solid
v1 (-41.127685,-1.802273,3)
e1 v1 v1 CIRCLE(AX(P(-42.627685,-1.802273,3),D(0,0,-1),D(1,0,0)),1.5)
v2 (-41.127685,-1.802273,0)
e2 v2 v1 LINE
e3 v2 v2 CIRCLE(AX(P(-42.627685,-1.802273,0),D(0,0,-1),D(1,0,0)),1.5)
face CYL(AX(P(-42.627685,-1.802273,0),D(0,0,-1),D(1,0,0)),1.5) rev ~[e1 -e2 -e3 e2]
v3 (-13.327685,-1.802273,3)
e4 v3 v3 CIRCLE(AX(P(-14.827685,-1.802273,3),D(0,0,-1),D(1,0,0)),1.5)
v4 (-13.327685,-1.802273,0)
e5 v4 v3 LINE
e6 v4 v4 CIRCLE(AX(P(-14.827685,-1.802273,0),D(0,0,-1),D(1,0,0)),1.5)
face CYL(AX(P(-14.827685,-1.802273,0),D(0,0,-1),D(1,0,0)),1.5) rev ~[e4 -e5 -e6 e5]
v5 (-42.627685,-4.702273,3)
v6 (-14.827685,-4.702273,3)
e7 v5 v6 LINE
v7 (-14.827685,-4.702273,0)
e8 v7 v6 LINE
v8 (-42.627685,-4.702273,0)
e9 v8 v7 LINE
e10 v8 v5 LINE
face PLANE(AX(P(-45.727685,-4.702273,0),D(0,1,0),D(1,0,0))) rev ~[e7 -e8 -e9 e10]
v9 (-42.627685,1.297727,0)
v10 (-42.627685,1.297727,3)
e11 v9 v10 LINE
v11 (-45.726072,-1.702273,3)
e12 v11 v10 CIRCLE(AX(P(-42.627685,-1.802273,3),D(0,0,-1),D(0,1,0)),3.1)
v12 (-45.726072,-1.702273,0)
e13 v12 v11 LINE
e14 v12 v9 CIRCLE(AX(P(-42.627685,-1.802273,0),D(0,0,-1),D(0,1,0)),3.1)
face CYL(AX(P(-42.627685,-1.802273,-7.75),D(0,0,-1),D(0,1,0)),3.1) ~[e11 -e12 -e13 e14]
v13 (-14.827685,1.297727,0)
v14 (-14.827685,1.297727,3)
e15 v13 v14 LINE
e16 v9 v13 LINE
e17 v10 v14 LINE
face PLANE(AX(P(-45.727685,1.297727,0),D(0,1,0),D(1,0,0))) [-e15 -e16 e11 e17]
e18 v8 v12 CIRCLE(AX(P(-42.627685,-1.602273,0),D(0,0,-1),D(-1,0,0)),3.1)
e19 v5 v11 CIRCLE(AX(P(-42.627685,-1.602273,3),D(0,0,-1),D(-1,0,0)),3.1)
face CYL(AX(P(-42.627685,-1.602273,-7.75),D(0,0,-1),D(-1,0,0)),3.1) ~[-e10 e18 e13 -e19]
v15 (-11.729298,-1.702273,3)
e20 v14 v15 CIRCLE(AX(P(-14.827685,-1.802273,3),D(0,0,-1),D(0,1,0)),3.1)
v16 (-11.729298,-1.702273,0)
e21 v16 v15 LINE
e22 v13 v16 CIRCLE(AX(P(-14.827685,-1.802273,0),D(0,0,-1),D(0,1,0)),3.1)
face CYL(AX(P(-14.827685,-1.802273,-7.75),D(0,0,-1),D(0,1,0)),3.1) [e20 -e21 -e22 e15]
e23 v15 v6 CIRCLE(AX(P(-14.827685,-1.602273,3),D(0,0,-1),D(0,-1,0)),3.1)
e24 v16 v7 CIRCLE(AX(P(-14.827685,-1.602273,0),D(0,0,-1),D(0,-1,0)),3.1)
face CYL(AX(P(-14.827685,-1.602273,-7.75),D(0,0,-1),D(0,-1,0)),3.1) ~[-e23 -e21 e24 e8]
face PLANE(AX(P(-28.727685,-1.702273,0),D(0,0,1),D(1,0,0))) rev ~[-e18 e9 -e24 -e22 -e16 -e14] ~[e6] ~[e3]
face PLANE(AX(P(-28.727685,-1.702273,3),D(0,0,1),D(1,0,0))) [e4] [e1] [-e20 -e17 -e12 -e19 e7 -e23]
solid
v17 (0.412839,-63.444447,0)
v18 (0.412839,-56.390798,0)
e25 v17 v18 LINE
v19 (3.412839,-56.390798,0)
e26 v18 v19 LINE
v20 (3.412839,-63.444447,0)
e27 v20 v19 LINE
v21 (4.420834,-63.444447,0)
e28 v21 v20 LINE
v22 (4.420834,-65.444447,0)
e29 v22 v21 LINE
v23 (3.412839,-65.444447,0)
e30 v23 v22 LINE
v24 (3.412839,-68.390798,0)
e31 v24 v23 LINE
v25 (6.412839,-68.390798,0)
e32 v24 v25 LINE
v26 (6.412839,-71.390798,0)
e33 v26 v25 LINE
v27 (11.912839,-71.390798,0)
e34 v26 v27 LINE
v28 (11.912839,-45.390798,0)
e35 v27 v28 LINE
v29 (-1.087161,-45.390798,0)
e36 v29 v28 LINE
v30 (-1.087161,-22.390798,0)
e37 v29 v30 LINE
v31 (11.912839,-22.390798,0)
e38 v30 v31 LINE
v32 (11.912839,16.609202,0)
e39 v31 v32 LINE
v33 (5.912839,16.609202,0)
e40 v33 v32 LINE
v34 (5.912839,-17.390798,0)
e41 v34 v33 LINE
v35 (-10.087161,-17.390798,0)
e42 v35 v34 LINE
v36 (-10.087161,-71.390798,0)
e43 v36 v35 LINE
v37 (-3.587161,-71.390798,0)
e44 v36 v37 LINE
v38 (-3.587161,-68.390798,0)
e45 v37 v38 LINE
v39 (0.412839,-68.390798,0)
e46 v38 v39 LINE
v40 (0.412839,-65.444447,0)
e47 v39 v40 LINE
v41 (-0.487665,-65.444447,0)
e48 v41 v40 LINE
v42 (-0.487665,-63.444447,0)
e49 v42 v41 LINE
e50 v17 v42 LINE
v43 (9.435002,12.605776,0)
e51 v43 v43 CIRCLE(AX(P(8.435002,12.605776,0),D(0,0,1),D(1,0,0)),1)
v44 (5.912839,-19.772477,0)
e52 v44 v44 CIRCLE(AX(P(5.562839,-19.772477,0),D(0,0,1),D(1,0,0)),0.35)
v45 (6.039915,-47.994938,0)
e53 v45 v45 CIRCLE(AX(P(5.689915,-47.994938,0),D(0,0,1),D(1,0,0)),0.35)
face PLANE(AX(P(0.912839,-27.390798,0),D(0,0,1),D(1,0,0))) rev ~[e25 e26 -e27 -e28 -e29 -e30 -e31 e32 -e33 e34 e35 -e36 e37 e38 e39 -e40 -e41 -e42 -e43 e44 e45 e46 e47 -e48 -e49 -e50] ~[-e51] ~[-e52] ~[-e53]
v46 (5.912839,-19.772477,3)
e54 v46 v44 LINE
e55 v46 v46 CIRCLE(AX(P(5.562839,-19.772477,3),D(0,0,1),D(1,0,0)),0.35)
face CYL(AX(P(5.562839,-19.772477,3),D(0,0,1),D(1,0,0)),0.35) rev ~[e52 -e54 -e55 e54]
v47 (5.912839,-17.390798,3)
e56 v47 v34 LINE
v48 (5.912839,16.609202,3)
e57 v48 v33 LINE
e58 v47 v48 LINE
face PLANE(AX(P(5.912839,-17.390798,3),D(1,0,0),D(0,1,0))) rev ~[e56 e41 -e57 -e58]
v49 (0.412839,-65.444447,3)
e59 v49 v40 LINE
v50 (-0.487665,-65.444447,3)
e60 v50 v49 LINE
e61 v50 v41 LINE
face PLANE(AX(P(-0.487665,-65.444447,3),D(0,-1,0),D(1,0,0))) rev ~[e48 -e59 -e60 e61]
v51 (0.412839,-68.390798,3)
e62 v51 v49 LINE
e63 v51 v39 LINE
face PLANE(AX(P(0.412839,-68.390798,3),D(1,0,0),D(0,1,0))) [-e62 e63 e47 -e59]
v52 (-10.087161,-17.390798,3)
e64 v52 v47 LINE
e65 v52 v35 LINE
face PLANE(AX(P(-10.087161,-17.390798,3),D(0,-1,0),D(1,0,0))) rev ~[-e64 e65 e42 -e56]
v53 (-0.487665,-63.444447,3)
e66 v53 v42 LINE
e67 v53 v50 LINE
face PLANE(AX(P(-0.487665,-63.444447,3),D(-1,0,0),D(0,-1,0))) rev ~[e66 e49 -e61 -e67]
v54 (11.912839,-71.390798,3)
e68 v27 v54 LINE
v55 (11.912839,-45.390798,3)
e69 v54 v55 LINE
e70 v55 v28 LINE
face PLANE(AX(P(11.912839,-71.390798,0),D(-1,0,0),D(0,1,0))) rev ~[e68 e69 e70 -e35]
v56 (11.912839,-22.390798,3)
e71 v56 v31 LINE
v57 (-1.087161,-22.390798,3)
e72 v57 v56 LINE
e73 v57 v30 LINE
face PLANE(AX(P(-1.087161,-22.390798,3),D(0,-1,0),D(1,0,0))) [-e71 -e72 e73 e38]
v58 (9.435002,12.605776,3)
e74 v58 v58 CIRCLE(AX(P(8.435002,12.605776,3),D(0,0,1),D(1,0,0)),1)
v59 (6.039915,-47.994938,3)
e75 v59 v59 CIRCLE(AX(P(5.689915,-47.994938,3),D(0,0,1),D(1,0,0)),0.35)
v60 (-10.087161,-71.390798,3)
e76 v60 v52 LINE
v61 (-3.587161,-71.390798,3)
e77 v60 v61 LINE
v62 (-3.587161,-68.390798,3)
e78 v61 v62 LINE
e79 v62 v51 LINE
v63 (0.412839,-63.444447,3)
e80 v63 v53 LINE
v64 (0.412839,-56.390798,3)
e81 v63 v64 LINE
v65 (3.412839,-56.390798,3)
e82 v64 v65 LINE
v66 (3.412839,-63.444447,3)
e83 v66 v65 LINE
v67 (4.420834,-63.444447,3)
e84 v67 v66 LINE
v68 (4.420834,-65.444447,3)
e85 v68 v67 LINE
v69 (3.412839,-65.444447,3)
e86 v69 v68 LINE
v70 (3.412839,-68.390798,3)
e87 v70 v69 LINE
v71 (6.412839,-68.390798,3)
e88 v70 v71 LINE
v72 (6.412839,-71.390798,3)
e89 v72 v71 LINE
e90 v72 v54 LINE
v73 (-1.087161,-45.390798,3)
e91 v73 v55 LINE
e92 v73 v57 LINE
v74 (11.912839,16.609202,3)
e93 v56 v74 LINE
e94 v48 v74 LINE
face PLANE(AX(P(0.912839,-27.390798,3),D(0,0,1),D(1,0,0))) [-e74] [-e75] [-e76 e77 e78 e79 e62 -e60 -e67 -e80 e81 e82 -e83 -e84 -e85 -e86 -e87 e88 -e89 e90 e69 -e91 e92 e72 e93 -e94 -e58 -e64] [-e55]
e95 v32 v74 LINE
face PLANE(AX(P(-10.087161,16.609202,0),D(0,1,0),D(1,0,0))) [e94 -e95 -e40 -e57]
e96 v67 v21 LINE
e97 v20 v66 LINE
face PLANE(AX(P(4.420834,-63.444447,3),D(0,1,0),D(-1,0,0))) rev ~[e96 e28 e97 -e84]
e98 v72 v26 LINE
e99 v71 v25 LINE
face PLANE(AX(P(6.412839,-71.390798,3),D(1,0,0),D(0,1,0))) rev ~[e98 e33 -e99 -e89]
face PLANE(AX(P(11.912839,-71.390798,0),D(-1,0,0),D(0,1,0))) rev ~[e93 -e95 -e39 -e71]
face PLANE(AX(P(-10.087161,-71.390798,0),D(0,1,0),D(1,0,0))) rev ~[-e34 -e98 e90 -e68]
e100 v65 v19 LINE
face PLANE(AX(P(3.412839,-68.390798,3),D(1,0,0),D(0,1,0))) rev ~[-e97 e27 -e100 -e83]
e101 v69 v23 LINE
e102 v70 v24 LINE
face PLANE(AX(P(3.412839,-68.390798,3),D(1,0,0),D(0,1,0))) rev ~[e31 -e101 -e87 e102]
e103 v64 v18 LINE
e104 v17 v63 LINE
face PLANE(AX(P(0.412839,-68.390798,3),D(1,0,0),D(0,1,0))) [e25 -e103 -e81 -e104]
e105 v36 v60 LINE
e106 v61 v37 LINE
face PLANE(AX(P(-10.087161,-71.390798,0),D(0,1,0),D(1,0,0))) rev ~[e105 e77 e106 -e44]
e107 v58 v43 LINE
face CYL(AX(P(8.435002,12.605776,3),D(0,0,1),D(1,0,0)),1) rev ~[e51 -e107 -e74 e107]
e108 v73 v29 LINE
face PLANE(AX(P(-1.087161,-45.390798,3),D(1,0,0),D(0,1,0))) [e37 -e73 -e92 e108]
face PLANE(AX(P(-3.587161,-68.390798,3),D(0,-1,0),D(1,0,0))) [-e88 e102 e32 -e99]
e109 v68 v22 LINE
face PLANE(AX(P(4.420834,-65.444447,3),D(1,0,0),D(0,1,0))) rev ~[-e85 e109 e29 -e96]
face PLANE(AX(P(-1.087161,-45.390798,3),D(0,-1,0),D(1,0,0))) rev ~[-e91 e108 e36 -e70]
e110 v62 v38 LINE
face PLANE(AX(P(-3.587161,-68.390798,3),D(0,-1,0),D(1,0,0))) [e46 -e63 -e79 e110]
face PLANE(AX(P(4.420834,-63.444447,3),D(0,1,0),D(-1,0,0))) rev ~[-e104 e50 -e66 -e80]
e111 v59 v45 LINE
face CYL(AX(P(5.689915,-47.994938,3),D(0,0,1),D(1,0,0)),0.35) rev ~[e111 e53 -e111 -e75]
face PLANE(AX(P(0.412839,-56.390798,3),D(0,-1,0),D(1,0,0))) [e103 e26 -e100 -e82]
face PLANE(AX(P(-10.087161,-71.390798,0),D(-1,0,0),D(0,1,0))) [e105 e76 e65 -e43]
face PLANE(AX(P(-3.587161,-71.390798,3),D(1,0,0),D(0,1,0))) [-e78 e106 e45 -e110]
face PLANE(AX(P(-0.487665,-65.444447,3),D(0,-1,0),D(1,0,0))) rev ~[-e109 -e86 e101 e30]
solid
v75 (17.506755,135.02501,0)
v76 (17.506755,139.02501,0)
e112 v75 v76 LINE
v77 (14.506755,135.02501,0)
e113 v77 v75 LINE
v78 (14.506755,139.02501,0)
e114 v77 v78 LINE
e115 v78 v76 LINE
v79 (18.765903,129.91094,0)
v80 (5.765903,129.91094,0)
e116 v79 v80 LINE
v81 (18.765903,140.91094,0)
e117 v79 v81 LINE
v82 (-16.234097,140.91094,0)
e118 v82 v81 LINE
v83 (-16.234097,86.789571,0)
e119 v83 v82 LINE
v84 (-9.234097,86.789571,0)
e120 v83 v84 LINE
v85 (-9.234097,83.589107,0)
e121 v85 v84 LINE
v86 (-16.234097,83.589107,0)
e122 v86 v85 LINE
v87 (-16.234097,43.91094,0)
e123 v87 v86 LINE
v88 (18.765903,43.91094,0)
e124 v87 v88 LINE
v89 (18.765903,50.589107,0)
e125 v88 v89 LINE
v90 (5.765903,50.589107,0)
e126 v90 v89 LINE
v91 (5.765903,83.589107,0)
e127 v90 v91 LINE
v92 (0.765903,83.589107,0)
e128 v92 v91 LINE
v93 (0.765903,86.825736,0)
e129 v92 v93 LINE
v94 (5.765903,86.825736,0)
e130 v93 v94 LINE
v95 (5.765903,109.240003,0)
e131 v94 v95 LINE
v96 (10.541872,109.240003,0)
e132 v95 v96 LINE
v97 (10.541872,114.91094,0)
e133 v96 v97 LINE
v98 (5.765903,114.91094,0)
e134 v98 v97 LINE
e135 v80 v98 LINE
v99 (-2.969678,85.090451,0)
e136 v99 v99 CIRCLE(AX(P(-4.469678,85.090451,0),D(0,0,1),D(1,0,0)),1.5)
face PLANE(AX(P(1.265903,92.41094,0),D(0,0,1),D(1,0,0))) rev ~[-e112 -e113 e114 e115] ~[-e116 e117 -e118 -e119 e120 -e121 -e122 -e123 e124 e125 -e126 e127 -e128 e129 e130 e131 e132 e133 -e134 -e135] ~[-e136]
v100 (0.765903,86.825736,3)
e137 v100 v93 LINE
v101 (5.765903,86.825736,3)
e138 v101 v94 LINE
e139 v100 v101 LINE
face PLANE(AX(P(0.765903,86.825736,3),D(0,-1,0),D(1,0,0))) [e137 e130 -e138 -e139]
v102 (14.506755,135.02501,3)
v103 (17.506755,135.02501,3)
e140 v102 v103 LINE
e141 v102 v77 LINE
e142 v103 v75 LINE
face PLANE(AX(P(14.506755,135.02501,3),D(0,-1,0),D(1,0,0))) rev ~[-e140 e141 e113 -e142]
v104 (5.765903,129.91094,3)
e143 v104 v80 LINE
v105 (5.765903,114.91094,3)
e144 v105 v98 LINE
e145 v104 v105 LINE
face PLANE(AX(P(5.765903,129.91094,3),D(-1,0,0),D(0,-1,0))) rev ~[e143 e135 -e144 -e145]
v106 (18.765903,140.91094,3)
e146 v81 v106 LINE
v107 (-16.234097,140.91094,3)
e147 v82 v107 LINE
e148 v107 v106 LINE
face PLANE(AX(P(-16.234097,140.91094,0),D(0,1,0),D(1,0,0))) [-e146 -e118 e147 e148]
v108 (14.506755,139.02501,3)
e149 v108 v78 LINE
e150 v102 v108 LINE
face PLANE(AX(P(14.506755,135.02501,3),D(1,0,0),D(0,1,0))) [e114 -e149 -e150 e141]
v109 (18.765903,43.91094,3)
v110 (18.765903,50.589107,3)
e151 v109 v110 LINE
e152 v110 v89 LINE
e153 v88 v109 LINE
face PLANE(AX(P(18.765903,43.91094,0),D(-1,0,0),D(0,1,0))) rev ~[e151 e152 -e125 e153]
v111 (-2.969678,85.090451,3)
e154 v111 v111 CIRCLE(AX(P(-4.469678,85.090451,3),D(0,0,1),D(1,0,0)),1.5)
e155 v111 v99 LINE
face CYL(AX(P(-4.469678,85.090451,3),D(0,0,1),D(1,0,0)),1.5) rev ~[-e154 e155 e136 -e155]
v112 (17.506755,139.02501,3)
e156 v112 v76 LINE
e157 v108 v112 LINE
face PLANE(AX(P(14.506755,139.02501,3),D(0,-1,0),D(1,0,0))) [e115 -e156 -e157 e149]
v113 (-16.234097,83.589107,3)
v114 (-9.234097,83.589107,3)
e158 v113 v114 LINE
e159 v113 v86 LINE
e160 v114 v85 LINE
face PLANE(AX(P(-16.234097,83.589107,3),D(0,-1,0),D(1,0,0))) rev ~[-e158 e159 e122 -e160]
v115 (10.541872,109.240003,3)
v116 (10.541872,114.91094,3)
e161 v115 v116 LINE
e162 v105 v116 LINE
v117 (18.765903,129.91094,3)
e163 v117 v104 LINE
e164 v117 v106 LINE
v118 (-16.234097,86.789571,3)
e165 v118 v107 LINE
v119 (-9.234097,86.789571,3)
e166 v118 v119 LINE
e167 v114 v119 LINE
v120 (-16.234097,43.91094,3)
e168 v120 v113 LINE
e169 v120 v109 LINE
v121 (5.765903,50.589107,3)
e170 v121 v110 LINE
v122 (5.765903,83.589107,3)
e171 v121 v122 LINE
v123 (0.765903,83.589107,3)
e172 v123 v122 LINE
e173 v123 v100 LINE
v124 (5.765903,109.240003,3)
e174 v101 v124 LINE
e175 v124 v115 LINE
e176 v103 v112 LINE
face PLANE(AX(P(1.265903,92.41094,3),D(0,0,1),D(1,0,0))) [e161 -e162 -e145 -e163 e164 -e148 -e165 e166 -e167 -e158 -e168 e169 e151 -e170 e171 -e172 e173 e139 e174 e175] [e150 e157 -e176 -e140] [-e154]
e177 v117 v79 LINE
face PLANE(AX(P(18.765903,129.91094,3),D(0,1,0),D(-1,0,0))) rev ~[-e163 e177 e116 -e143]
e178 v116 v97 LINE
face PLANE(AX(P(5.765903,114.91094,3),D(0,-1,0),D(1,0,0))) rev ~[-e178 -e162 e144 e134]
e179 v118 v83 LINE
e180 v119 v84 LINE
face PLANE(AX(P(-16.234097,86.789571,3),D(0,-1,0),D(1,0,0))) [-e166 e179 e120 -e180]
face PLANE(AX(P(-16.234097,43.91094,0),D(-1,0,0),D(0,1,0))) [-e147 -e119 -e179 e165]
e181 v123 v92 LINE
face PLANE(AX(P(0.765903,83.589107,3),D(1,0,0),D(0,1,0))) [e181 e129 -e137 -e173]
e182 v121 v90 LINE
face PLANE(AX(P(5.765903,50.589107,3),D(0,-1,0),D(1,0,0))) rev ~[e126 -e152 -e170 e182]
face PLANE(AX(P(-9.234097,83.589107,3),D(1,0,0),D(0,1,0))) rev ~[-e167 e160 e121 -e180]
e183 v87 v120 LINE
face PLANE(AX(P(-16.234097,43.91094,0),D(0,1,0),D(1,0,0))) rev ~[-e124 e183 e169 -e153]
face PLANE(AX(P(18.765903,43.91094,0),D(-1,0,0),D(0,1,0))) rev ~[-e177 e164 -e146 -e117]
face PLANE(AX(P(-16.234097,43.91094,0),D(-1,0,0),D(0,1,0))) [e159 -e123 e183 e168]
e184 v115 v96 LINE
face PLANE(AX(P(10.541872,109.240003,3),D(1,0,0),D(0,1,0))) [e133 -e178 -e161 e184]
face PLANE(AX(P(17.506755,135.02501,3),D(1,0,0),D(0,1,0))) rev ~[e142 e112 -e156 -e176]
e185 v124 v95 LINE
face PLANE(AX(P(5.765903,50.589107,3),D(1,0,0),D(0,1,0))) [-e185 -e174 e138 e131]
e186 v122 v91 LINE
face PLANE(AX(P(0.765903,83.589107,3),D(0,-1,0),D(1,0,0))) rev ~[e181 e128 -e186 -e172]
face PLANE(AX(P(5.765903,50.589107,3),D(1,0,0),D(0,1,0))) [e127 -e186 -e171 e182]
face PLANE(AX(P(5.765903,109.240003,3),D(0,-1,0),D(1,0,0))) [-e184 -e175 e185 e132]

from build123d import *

# Parameters (mm, degrees)
F0_W        = 34
F0_H        = 6
F1_DEPTH    = 3
F2_T1_DEPTH = 18.5
F3_T1_DEPTH = 18.5
F4_R        = 1.5
F5_DEPTH    = 25.8
F6_W        = 35
F6_H        = 97
F7_DEPTH    = 3
F9_DEPTH    = 65
F10_W       = 13
F10_H       = 58.6508959532
F11_DEPTH   = 25
F12_W       = 5
F12_H       = 3.23662889
F12_W_2     = 7
F12_H_2     = 3.2004637718
F13_DEPTH   = 35.3
F14_R       = 1.5
F15_DEPTH   = 25
F16_W       = 8.2240308821
F16_H       = 5.6709373705
F16_W_2     = 3
F16_H_2     = 4
F17_DEPTH   = 25
F18_W       = 22
F18_H       = 88
F19_DEPTH   = 3
F20_W       = 16
F20_H       = 34
F21_DEPTH   = 14.5
F22_W       = 13
F22_H       = 23
F23_DEPTH   = 25
F24_W       = 10
F24_H       = 3
F25_DEPTH   = 25
F26_W       = 3
F26_H       = 12
F27_DEPTH   = 25
F29_DEPTH   = 25
F30_R       = 1
F30_R_2     = 0.35
F31_DEPTH   = 25


# Not quite as in the source:
# - a fillet or chamfer that OpenCascade refuses, or shapes differently, is made with other operations: its cross-section is extruded or revolved along the edge and cut away or added


with BuildPart() as f1:
    # F0 (on Top) → F1 (new body)
    with BuildSketch(Plane.XY):
        with Locations((-28.7276850939, -1.7022728249)):
            Rectangle(F0_W, F0_H)
    extrude(amount=F1_DEPTH)

    # F2: fillet of radius 3.1 on 2 edges, made by hand

    # F2_s2 → F2_t1 (cut)
    with BuildSketch(Plane.XY.offset(-7.75)):
        with BuildLine():
            ThreePointArc((-14.8276850939, -4.7022728249), (-12.6356540722, -3.7943038466), (-11.7276850939, -1.6022728249))
            Line((-11.7276850939, -1.6022728249), (-11.7276850939, -4.7022728249))
            Line((-11.7276850939, -4.7022728249), (-14.8276850939, -4.7022728249))
        make_face()
        with BuildLine():
            ThreePointArc((-14.8276850939, 1.2977271751), (-12.6356540722, 0.3897581967), (-11.7276850939, -1.8022728249))
            Line((-11.7276850939, -1.8022728249), (-11.7276850939, 1.2977271751))
            Line((-11.7276850939, 1.2977271751), (-14.8276850939, 1.2977271751))
        make_face()
    extrude(amount=F2_T1_DEPTH, mode=Mode.SUBTRACT)

    # F3: fillet of radius 3.1 on 2 edges, made by hand

    # F3_s2 → F3_t1 (cut)
    with BuildSketch(Plane.XY.offset(-7.75)):
        with BuildLine():
            ThreePointArc((-45.7276850939, -1.6022728249), (-44.8197161156, -3.7943038466), (-42.6276850939, -4.7022728249))
            Line((-42.6276850939, -4.7022728249), (-45.7276850939, -4.7022728249))
            Line((-45.7276850939, -4.7022728249), (-45.7276850939, -1.6022728249))
        make_face()
        with BuildLine():
            ThreePointArc((-42.6276850939, 1.2977271751), (-44.8197161156, 0.3897581967), (-45.7276850939, -1.8022728249))
            Line((-45.7276850939, -1.8022728249), (-45.7276850939, 1.2977271751))
            Line((-45.7276850939, 1.2977271751), (-42.6276850939, 1.2977271751))
        make_face()
    extrude(amount=F3_T1_DEPTH, mode=Mode.SUBTRACT)

    # F4 (on face) → F5 (cut)
    with BuildSketch(Plane(origin=(0, 0, 0), x_dir=(1, 0, 0), z_dir=(0, 0, -1))):
        with Locations((-42.6276850939, 1.8022728249)):
            Circle(F4_R)
        with Locations((-14.8276850939, 1.8022728249)):
            Circle(F4_R)
    extrude(amount=-F5_DEPTH, mode=Mode.SUBTRACT)


with BuildPart() as f7:
    # F6 (on Top) → F7 (new body)
    with BuildSketch(Plane.XY):
        with Locations((1.2659030035, 92.4109403007)):
            Rectangle(F6_W, F6_H)
    extrude(amount=F7_DEPTH)

    # F8 (on face) → F9 (cut)
    with BuildSketch(Plane.XY.offset(3)):
        Polygon((18.7659030035, 114.9109403007), (18.7659030035, 129.9109403007), (14.4255761913, 129.9109403007), (5.7659030035, 129.9109403007), (5.7659030035, 114.9109403007), align=None)
    extrude(amount=-F9_DEPTH, mode=Mode.SUBTRACT)

    # F10 (on face) → F11 (cut)
    with BuildSketch(Plane.XY.offset(3)):
        with Locations((12.2659030035, 79.9145549536)):
            Rectangle(F10_W, F10_H)
    extrude(amount=-F11_DEPTH, mode=Mode.SUBTRACT)

    # F12 (on face) → F13 (cut)
    with BuildSketch(Plane.XY.offset(3)):
        with Locations((3.2659030035, 85.207421422)):
            Rectangle(F12_W, F12_H)
        with Locations((-12.7340969965, 85.1893388629)):
            Rectangle(F12_W_2, F12_H_2)
    extrude(amount=-F13_DEPTH, mode=Mode.SUBTRACT)

    # F14 (on face) → F15 (cut)
    with BuildSketch(Plane.XY.offset(3)):
        with Locations((-4.4696778059, 85.0904509425)):
            Circle(F14_R)
    extrude(amount=-F15_DEPTH, mode=Mode.SUBTRACT)

    # F16 (on face) → F17 (cut)
    with BuildSketch(Plane.XY.offset(3)):
        with Locations((14.6538875625, 112.0754716154)):
            Rectangle(F16_W, F16_H)
        with Locations((16.0067553967, 137.0250095129)):
            Rectangle(F16_W_2, F16_H_2)
    extrude(amount=-F17_DEPTH, mode=Mode.SUBTRACT)


with BuildPart() as f19:
    # F18 (on Top) → F19 (new body)
    with BuildSketch(Plane.XY):
        with Locations((0.9128389647, -27.3907984654)):
            Rectangle(F18_W, F18_H)
    extrude(amount=F19_DEPTH)

    # F20 (on face) → F21 (cut)
    with BuildSketch(Plane.XY.offset(3)):
        with Locations((-2.0871610353, -0.3907984654)):
            Rectangle(F20_W, F20_H)
    extrude(amount=-F21_DEPTH, mode=Mode.SUBTRACT)

    # F22 (on face) → F23 (cut)
    with BuildSketch(Plane.XY.offset(3)):
        with Locations((5.4128389647, -33.8907984654)):
            Rectangle(F22_W, F22_H)
    extrude(amount=-F23_DEPTH, mode=Mode.SUBTRACT)

    # F24 (on face) → F25 (cut)
    with BuildSketch(Plane.XY.offset(3)):
        with Locations((1.4128389647, -69.8907984654)):
            Rectangle(F24_W, F24_H)
    extrude(amount=-F25_DEPTH, mode=Mode.SUBTRACT)

    # F26 (on face) → F27 (cut)
    with BuildSketch(Plane.XY.offset(3)):
        with Locations((1.9128389647, -62.3907984654)):
            Rectangle(F26_W, F26_H)
    extrude(amount=-F27_DEPTH, mode=Mode.SUBTRACT)

    # F28 (on face) → F29 (cut)
    with BuildSketch(Plane.XY.offset(3)):
        Polygon((-0.4876649764, -63.4444471002), (-0.4876649764, -65.4444471002), (0.4128389647, -65.4444471002), (4.4208336622, -65.4444471002), (4.4208336622, -63.4444471002), align=None)
    extrude(amount=-F29_DEPTH, mode=Mode.SUBTRACT)

    # F30 (on face) → F31 (cut)
    with BuildSketch(Plane.XY.offset(3)):
        with Locations((8.4350015968, 12.605776079)):
            Circle(F30_R)
        with Locations((5.5628389647, -19.772477448)):
            Circle(F30_R_2)
        with Locations((5.6899152696, -47.9949377477)):
            Circle(F30_R_2)
    extrude(amount=-F31_DEPTH, mode=Mode.SUBTRACT)


solid = Compound([f1.part, f7.part, f19.part])
